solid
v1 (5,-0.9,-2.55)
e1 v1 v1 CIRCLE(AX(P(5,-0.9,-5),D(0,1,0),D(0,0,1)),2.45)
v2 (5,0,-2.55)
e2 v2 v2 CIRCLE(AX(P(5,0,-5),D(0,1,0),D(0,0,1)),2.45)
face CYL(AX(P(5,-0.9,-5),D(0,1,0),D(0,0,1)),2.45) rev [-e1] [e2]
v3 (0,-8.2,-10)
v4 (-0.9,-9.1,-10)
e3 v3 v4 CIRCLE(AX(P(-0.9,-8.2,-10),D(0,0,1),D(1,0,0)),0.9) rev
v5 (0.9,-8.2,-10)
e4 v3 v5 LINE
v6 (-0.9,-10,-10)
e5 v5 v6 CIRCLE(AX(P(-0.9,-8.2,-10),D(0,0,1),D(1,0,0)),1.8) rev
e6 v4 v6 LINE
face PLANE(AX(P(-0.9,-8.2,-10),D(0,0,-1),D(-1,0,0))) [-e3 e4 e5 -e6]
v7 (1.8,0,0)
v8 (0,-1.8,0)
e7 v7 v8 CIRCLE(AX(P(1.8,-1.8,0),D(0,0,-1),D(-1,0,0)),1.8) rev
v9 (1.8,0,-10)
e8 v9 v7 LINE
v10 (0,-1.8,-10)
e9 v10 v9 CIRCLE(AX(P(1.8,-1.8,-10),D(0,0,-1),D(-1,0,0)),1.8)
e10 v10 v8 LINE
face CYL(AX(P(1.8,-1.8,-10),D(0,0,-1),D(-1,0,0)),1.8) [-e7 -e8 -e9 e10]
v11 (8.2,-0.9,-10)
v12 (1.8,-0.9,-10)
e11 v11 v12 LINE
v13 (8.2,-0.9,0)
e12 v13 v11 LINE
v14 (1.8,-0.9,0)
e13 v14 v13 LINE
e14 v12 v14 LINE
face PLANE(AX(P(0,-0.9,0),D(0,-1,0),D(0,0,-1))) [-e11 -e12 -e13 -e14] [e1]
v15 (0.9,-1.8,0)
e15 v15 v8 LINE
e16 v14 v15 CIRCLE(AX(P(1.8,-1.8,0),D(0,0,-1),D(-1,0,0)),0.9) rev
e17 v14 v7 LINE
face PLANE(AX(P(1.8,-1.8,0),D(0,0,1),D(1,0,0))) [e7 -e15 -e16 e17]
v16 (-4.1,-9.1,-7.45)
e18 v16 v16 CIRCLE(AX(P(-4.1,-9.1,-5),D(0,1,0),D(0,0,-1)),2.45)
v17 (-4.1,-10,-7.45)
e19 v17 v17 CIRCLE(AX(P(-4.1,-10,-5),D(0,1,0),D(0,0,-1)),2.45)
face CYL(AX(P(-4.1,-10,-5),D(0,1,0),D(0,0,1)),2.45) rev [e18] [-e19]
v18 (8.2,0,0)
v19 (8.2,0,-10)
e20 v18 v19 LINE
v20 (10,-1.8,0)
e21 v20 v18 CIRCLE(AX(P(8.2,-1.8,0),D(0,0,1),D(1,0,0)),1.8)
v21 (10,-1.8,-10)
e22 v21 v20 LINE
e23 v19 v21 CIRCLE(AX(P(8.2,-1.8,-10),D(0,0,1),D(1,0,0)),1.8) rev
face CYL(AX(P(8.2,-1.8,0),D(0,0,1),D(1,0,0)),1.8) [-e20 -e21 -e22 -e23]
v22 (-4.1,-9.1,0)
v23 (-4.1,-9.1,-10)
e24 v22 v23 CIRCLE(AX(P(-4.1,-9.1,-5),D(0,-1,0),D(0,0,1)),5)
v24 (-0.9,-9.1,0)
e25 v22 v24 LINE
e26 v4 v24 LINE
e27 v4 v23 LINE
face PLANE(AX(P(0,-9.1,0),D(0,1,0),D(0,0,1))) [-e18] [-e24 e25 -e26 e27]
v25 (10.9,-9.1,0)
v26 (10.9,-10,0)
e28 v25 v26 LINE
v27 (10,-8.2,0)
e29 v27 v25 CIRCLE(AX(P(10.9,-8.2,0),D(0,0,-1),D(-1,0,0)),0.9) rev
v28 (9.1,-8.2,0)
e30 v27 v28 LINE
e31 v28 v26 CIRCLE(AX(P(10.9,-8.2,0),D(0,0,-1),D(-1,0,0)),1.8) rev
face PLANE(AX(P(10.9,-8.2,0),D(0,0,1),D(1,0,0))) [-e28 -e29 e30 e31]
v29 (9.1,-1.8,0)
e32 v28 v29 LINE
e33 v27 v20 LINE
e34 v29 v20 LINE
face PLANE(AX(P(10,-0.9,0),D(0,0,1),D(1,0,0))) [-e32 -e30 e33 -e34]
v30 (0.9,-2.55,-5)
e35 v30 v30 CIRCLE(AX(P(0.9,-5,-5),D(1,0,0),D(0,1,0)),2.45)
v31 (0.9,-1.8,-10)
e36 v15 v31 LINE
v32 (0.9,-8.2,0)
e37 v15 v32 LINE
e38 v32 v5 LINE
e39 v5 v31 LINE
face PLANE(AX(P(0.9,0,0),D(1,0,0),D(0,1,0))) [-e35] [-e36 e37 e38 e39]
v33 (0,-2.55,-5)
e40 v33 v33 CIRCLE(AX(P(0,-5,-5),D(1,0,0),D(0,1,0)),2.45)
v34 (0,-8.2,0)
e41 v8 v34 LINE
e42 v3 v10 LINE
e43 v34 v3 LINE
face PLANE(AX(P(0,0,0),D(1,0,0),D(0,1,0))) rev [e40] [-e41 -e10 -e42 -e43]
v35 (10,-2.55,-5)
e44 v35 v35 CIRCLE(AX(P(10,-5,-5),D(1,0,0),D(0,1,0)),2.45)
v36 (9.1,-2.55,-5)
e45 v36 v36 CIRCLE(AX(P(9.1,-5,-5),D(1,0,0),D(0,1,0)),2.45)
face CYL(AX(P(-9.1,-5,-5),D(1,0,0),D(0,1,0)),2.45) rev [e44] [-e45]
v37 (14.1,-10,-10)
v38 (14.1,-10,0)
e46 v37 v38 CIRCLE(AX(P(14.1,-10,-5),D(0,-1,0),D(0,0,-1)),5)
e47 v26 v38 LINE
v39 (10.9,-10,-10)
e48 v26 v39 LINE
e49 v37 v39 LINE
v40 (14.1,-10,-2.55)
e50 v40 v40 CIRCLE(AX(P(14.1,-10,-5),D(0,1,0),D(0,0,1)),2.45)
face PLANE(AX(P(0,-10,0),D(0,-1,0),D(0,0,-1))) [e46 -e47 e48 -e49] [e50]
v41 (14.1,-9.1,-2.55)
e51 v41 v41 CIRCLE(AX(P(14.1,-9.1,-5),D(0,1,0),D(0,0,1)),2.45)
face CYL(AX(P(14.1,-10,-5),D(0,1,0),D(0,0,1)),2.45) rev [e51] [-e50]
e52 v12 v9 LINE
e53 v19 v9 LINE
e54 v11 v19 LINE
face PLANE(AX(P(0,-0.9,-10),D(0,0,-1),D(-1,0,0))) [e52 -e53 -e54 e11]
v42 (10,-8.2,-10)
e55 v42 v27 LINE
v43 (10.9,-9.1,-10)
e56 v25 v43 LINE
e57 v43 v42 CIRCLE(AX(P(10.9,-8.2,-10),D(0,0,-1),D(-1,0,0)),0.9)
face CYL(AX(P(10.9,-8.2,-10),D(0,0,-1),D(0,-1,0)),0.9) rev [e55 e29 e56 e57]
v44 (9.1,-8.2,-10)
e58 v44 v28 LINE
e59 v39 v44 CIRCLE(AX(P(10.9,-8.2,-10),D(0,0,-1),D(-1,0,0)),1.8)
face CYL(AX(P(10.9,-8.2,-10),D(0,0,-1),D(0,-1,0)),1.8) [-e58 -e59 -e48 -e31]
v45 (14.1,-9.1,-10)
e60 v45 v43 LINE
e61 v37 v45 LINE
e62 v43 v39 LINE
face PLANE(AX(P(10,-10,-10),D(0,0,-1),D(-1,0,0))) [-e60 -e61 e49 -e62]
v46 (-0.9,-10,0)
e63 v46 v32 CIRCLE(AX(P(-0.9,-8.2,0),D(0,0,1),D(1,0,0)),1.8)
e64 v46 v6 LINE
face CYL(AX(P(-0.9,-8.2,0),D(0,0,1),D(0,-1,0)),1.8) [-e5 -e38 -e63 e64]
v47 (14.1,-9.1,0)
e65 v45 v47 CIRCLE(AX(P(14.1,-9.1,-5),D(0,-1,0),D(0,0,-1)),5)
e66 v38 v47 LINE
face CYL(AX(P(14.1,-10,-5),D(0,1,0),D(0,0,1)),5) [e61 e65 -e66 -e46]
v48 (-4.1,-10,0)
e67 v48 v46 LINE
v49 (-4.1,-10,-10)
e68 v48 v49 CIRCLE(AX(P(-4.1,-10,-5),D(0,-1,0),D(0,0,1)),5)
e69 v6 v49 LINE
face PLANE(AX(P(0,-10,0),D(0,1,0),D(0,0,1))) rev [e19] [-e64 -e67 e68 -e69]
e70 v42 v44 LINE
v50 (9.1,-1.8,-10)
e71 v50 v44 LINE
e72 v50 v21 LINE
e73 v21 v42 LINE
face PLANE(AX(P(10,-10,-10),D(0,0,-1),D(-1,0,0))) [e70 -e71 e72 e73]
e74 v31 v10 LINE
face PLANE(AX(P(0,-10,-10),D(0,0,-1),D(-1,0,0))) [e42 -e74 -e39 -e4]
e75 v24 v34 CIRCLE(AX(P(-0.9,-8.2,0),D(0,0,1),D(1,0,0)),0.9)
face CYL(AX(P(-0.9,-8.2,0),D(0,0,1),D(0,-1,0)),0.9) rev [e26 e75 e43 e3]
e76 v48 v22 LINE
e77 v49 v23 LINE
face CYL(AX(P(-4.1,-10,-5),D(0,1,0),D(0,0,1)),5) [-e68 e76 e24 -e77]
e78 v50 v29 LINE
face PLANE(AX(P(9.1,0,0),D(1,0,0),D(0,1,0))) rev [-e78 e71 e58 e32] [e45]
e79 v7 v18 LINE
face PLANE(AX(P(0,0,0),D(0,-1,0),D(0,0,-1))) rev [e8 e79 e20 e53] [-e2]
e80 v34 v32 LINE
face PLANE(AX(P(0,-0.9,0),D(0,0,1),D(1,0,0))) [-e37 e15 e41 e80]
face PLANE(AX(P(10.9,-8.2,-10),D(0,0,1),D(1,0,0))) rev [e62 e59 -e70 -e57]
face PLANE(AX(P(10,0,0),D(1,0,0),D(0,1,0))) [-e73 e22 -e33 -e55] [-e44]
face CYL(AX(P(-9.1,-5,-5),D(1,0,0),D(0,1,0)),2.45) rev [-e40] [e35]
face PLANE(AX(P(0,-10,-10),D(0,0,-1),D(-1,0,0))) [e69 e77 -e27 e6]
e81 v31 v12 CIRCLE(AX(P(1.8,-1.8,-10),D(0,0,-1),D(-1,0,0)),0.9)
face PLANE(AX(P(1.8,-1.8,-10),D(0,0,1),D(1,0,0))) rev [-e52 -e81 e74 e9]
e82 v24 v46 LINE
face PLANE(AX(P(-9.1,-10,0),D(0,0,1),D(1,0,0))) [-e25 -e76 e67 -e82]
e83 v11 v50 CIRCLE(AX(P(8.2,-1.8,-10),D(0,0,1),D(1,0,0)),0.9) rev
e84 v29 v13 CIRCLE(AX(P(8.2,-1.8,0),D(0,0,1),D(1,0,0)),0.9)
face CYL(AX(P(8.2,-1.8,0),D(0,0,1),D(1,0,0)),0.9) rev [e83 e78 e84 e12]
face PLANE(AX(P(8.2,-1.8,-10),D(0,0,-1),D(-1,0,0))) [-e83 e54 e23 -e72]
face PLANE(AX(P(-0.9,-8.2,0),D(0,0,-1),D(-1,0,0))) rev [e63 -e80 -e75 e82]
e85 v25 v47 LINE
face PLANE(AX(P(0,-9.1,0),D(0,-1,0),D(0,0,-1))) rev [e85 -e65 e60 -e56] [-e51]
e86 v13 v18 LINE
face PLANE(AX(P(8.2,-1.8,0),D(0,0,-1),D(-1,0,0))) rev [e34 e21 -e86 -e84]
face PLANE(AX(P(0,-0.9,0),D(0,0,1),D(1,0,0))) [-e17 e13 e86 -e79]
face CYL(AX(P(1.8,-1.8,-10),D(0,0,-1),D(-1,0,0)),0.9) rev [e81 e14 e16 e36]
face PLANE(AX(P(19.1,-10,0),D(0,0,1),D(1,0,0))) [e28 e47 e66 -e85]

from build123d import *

# Parameters (mm, degrees)
SKETCH1_W                      = 10
SKETCH1_H                      = 10
SKETCH1_R                      = 2.45
BASE_FLANGE1_DEPTH             = 0.9
EDGE_FLANGE1_STRIP_W           = 5.4
EDGE_FLANGE1_STRIP_H           = 0.9
EDGE_FLANGE1_STRIP_CUT_DEPTH   = 10
EDGE_FLANGE1_STRIP_2_W         = 5.4
EDGE_FLANGE1_STRIP_2_H         = 0.9
EDGE_FLANGE1_STRIP_CUT_2_DEPTH = 10
EDGE_FLANGE1_DEPTH             = 10
EDGE_FLANGE1_BEND_DEPTH        = 10
EDGE_FLANGE2_STRIP_W           = 5.4
EDGE_FLANGE2_STRIP_H           = 0.9
EDGE_FLANGE2_STRIP_CUT_DEPTH   = 10
EDGE_FLANGE2_STRIP_2_W         = 5.4
EDGE_FLANGE2_STRIP_2_H         = 0.9
EDGE_FLANGE2_STRIP_CUT_2_DEPTH = 10
EDGE_FLANGE2_DEPTH             = 10
EDGE_FLANGE2_BEND_DEPTH        = 10
HOLE1_OUTLINE_R                = 2.45
HOLE1_DEPTH                    = 10
SKETCH21_R                     = 2.45
CUT_EXTRUDE1_DEPTH             = 10


# Read off the part's stored shape, not the designer's step: Hole1
# Sheet-metal steps are written as plain solids
with BuildPart() as part:
    # Sketch1 → Base-Flange1 (new body)
    with BuildSketch(Plane(origin=(0, 0, 0), x_dir=(1, 0, 0), z_dir=(0, 1, 0))):
        with Locations((5, 5)):
            Rectangle(SKETCH1_W, SKETCH1_H)
        with Locations(Location((5, 5, 0), (0, 0, 270))):
            Circle(SKETCH1_R, mode=Mode.SUBTRACT)
    extrude(amount=-BASE_FLANGE1_DEPTH)

    # Edge-Flange1 strip (across the edge) → Edge-Flange1 strip cut (cut)
    with BuildSketch(Plane(origin=(10, -0.9, -10), x_dir=(-1, 0, 0), z_dir=(0, 0, 1))):
        with Locations((-0.9, -0.45)):
            Rectangle(EDGE_FLANGE1_STRIP_W, EDGE_FLANGE1_STRIP_H)
    extrude(amount=EDGE_FLANGE1_STRIP_CUT_DEPTH, mode=Mode.SUBTRACT)

    # Edge-Flange1 strip 2 (across the edge) → Edge-Flange1 strip cut 2 (cut)
    with BuildSketch(Plane(origin=(0, -0.9, 0), x_dir=(1, 0, 0), z_dir=(0, 0, -1))):
        with Locations((-0.9, -0.45)):
            Rectangle(EDGE_FLANGE1_STRIP_2_W, EDGE_FLANGE1_STRIP_2_H)
    extrude(amount=EDGE_FLANGE1_STRIP_CUT_2_DEPTH, mode=Mode.SUBTRACT)

    # Edge-Flange1 section (across the edge) → Edge-Flange1 (add)
    with BuildSketch(Plane(origin=(10, -0.9, -10), x_dir=(-1, 0, 0), z_dir=(0, 0, 1))):
        with BuildLine():
            Line((0, 0.9), (0, 9.1))
            Line((0, 9.1), (0.9, 9.1))
            Line((0.9, 9.1), (0.9, 0.9))
            ThreePointArc((0.9, 0.9), (1.163603897, 0.263603897), (1.8, 0))
            Line((1.8, 0), (1.8, -0.9))
            ThreePointArc((1.8, -0.9), (0.527207794, -0.372792206), (0, 0.9))
        make_face()
    extrude(amount=EDGE_FLANGE1_DEPTH)

    # Edge-Flange1 section 2 (across the edge) → Edge-Flange1 bend (add)
    with BuildSketch(Plane(origin=(0, -0.9, 0), x_dir=(1, 0, 0), z_dir=(0, 0, -1))):
        with BuildLine():
            Line((0, 0.9), (0, 9.1))
            Line((0, 9.1), (0.9, 9.1))
            Line((0.9, 9.1), (0.9, 0.9))
            ThreePointArc((0.9, 0.9), (1.163603897, 0.263603897), (1.8, 0))
            Line((1.8, 0), (1.8, -0.9))
            ThreePointArc((1.8, -0.9), (0.527207794, -0.372792206), (0, 0.9))
        make_face()
    extrude(amount=EDGE_FLANGE1_BEND_DEPTH)

    # Edge-Flange2 strip (across the edge) → Edge-Flange2 strip cut (cut)
    with BuildSketch(Plane(origin=(10, -10, 0), x_dir=(0, 1, 0), z_dir=(0, 0, -1))):
        with Locations((-0.9, -0.45)):
            Rectangle(EDGE_FLANGE2_STRIP_W, EDGE_FLANGE2_STRIP_H)
    extrude(amount=EDGE_FLANGE2_STRIP_CUT_DEPTH, mode=Mode.SUBTRACT)

    # Edge-Flange2 strip 2 (across the edge) → Edge-Flange2 strip cut 2 (cut)
    with BuildSketch(Plane(origin=(0, -10, -10), x_dir=(0, 1, 0), z_dir=(0, 0, 1))):
        with Locations((-0.9, -0.45)):
            Rectangle(EDGE_FLANGE2_STRIP_2_W, EDGE_FLANGE2_STRIP_2_H)
    extrude(amount=EDGE_FLANGE2_STRIP_CUT_2_DEPTH, mode=Mode.SUBTRACT)

    # Edge-Flange2 section (across the edge) → Edge-Flange2 (add)
    with BuildSketch(Plane(origin=(10, -10, 0), x_dir=(0, 1, 0), z_dir=(0, 0, -1))):
        with BuildLine():
            Line((0, 0.9), (0, 9.1))
            Line((0, 9.1), (0.9, 9.1))
            Line((0.9, 9.1), (0.9, 0.9))
            ThreePointArc((0.9, 0.9), (1.163603897, 0.263603897), (1.8, 0))
            Line((1.8, 0), (1.8, -0.9))
            ThreePointArc((1.8, -0.9), (0.527207794, -0.372792206), (0, 0.9))
        make_face()
    extrude(amount=EDGE_FLANGE2_DEPTH)

    # Edge-Flange2 section 2 (across the edge) → Edge-Flange2 bend (add)
    with BuildSketch(Plane(origin=(0, -10, -10), x_dir=(0, 1, 0), z_dir=(0, 0, 1))):
        with BuildLine():
            Line((0, 0.9), (0, 9.1))
            Line((0, 9.1), (0.9, 9.1))
            Line((0.9, 9.1), (0.9, 0.9))
            ThreePointArc((0.9, 0.9), (1.163603897, 0.263603897), (1.8, 0))
            Line((1.8, 0), (1.8, -0.9))
            ThreePointArc((1.8, -0.9), (0.527207794, -0.372792206), (0, 0.9))
        make_face()
    extrude(amount=EDGE_FLANGE2_BEND_DEPTH)

    # Hole1 outline → Hole1 (cut)
    with BuildSketch(Plane.YZ):
        with Locations((-5, -5)):
            Circle(HOLE1_OUTLINE_R)
    extrude(amount=HOLE1_DEPTH, mode=Mode.SUBTRACT)

    # Sketch21 → Cut-Extrude1 (cut)
    with BuildSketch(Plane(origin=(0, -9.1, 0), x_dir=(1, 0, 0), z_dir=(0, 1, 0))):
        with Locations(Location((14.1, 5, 0), (0, 0, 270))):
            Circle(SKETCH21_R)
        with Locations(Location((-4.1, 5, 0), (0, 0, 90))):
            Circle(SKETCH21_R)
        with BuildLine():
            Line((-4.1, 10), (-4.552354971, 12.340568082))
            Line((-4.552354971, 12.340568082), (-11.187715638, 12.084129022))
            Line((-11.187715638, 12.084129022), (-11.412099815, 3.1728717))
            Line((-11.412099815, 3.1728717), (-10.931276579, -1.41097649))
            Line((-10.931276579, -1.41097649), (-3.526598732, -3.206049908))
            Line((-3.526598732, -3.206049908), (-4.1, 0))
            ThreePointArc((-4.1, 0), (-9.1, 5), (-4.1, 10))
        make_face()
        with BuildLine():
            Line((14.1, 10), (20.065794752, 12.917555966))
            Line((20.065794752, 12.917555966), (23.30333788, -2.532897376))
            Line((23.30333788, -2.532897376), (14.680574501, -2.532897376))
            Line((14.680574501, -2.532897376), (14.1, 0))
            ThreePointArc((14.1, 0), (19.1, 5), (14.1, 10))
        make_face()
    extrude(amount=-CUT_EXTRUDE1_DEPTH, mode=Mode.SUBTRACT)


solid = part.part
